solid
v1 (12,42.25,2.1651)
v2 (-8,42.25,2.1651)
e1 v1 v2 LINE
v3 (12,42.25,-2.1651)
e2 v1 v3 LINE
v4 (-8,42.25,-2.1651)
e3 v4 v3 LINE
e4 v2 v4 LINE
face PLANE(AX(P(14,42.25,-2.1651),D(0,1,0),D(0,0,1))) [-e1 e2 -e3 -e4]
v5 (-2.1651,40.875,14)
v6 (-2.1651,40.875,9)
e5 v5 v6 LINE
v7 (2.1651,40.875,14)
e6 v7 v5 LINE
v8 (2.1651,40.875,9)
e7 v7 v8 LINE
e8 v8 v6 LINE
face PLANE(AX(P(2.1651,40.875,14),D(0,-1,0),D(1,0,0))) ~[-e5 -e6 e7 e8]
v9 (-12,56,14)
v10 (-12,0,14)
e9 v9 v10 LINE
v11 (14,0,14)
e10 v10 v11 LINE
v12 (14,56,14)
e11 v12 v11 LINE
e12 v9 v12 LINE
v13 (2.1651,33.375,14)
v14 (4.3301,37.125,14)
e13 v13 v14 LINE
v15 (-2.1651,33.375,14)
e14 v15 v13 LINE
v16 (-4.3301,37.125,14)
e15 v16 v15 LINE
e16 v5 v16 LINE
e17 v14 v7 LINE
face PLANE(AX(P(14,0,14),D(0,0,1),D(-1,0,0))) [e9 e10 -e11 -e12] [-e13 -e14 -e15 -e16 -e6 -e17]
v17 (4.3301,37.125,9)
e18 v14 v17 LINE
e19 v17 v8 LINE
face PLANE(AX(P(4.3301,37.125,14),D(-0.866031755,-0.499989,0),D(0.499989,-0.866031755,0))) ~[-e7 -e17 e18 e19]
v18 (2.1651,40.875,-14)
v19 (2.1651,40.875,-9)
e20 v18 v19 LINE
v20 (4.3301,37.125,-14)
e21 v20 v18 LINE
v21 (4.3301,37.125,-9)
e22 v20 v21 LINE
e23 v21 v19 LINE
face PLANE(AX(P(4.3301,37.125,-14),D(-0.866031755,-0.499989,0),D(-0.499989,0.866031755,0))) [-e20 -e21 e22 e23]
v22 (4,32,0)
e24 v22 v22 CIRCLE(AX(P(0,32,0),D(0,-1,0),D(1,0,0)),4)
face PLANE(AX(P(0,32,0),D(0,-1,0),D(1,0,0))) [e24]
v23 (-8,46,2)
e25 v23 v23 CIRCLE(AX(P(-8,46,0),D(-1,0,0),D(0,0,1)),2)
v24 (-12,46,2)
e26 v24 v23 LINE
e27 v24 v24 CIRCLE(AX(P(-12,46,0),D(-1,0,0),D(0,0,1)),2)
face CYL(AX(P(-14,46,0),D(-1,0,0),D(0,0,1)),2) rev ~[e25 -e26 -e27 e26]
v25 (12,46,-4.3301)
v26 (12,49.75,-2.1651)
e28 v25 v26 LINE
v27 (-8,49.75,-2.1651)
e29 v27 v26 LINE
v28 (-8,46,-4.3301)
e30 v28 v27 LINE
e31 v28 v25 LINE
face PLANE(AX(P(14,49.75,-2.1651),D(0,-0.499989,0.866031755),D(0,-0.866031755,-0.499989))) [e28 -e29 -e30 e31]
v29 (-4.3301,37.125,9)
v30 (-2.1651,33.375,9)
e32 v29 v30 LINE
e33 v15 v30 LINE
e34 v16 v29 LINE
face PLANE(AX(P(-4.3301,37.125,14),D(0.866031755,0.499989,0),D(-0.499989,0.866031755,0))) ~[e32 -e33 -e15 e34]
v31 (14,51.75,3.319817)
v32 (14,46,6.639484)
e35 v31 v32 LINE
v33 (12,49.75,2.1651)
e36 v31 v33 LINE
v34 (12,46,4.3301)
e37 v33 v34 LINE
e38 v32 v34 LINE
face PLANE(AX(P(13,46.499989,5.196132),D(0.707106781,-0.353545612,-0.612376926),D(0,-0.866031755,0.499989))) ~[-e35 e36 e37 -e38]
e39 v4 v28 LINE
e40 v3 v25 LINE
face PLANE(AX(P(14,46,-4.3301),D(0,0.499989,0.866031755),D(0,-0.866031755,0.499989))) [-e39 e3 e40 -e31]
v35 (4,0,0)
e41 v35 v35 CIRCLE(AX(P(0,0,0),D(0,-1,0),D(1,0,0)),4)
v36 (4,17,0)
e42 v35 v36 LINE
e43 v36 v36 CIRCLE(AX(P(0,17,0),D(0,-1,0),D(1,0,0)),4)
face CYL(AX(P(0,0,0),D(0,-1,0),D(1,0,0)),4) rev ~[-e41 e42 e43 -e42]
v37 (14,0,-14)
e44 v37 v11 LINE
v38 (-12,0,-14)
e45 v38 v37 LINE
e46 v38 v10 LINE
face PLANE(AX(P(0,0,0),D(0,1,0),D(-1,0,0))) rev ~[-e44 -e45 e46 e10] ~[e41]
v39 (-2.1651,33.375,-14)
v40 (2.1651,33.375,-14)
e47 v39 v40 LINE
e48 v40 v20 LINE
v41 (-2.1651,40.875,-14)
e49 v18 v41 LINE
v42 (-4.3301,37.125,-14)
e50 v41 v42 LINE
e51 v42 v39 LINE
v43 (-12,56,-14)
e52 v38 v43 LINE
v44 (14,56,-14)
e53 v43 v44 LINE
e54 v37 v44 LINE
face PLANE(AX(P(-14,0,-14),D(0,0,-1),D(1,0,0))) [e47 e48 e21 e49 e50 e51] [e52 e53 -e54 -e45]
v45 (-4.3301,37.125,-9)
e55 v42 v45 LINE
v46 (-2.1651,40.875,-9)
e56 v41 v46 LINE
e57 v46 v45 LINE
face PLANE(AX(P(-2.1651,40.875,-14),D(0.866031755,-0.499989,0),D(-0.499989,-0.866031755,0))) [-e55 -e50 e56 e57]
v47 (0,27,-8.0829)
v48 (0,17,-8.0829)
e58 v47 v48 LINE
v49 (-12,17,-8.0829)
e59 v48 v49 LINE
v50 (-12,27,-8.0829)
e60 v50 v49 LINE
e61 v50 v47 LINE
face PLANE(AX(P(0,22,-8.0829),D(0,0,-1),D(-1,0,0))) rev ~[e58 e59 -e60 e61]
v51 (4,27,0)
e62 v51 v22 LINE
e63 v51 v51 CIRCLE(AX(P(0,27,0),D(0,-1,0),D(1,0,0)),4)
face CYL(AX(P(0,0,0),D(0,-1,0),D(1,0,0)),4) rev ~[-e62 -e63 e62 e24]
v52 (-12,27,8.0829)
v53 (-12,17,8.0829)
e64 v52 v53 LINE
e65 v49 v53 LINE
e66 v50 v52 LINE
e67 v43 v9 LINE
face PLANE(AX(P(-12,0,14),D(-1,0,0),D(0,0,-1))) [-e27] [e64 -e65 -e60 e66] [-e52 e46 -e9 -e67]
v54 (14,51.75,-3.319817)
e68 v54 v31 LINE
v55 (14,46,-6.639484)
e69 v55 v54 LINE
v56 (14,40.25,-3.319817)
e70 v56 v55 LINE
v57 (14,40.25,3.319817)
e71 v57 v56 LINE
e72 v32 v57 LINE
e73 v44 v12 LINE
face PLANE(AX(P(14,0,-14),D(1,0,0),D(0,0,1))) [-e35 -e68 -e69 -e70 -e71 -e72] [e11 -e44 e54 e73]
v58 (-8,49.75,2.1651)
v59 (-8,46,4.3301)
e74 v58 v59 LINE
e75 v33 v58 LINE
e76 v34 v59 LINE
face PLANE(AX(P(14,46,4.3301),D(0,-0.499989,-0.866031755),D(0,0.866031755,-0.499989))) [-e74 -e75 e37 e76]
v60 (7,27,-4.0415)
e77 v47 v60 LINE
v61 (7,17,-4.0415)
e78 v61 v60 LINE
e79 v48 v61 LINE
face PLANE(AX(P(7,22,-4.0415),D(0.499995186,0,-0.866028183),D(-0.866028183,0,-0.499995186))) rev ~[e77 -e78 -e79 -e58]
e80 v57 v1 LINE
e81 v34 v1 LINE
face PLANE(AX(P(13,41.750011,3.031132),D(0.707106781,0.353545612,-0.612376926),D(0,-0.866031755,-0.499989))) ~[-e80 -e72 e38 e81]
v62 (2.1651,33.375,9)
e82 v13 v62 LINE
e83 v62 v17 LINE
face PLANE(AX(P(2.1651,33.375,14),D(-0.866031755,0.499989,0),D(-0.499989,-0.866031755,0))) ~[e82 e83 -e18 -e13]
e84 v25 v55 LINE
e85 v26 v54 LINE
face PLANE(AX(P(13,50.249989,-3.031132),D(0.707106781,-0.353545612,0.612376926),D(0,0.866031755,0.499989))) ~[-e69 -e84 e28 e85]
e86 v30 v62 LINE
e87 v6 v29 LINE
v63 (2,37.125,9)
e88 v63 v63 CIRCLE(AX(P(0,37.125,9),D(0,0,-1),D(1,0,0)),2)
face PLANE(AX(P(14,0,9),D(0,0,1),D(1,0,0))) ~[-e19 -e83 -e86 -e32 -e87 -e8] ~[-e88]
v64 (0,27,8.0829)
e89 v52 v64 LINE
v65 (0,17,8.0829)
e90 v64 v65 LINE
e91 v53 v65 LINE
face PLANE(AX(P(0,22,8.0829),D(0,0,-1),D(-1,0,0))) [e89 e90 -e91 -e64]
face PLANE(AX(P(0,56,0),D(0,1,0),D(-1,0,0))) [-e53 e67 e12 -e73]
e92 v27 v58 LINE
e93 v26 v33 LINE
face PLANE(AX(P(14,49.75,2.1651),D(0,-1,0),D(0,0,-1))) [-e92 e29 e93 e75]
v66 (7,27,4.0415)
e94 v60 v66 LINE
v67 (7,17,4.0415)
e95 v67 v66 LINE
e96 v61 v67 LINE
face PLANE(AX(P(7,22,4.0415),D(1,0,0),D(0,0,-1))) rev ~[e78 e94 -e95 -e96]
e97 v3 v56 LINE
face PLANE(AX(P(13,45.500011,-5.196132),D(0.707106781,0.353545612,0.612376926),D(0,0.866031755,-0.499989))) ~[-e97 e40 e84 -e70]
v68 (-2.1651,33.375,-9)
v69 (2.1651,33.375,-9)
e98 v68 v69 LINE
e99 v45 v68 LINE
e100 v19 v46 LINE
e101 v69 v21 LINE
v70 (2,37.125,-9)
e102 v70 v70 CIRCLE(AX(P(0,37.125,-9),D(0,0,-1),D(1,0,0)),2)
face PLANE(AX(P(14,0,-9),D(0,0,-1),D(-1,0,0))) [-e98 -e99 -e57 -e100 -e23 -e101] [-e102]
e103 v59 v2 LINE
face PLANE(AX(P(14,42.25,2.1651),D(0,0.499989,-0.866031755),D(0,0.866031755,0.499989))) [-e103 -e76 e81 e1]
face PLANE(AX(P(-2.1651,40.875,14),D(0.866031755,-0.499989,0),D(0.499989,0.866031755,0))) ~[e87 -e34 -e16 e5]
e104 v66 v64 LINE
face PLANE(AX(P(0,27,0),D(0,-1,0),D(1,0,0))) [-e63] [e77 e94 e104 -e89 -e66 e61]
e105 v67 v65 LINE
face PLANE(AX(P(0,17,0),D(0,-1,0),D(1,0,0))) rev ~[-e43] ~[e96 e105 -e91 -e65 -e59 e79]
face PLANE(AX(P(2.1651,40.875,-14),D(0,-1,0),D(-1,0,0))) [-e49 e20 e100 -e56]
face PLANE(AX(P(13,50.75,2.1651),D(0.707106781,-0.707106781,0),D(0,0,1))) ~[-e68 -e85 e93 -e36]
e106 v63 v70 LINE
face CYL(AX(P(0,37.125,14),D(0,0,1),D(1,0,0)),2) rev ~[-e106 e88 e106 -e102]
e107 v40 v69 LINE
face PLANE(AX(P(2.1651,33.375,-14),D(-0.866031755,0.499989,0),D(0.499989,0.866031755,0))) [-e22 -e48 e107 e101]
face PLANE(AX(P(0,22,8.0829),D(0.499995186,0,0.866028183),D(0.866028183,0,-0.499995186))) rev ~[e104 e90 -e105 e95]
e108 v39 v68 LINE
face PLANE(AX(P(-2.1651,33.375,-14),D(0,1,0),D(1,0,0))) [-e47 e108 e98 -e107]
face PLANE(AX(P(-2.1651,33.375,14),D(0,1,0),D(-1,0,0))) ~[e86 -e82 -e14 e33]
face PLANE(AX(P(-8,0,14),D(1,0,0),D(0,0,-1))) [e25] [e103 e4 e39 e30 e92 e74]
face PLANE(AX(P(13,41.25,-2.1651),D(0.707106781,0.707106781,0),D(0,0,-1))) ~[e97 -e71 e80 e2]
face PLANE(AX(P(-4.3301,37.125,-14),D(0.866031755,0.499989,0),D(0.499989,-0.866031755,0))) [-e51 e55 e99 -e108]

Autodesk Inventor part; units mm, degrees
ref_plane "YZ Plane" through (0, 0, 0) normal (1, 0, 0) x (0, 1, 0)
ref_plane "XZ Plane" through (0, 0, 0) normal (0, 1, 0) x (-1, 0, 0)
ref_plane "XY Plane" through (0, 0, 0) normal (0, 0, 1) x (1, 0, 0)
sketch "Эскиз1" plane through (0, 0, 0) normal (0, 1, 0) x (-1, 0, 0)
  line L0 (-14, 14) -> (14, 14)
  line L1 (14, 14) -> (14, -14)
  line L2 (14, -14) -> (-14, -14)
  line L3 (-14, -14) -> (-14, 14)
  line L4 (-14, 14) -> (14, -14) construction
  line L5 (14, 14) -> (-14, -14) construction
  point P0 (0, 0)
  dimension "d0" = 28
  dimension "d1" = 28
extrude "Выдавливание1" add sketch "Эскиз1" along normal blind 56
sketch "Эскиз2" plane through (0, 0, 0) normal (0, -1, 0) x (1, 0, 0)
  circle A0 centre (0, 0) radius 4
extrude "Выдавливание2" cut sketch "Эскиз2" against normal blind 32
sketch "Эскиз3" plane through (-14, 0, -14) normal (-1, 0, 0) x (0, 0, 1)
  circle A0 centre (14, 46) radius 2
  point P0 (14, 0)
  dimension "d24" = 4
extrude "Выдавливание3" cut sketch "Эскиз3" against normal through all
sketch "Эскиз4" plane through (14, 0, 14) normal (1, 0, 0) x (0, 0, -1)
  circle A0 centre (14, 46) radius 2 projected
  line L0 (9.6699, 46) -> (11.8349, 49.75)
  line L1 (11.8349, 49.75) -> (16.1651, 49.75)
  line L2 (16.1651, 49.75) -> (18.3301, 46)
  line L3 (18.3301, 46) -> (16.1651, 42.25)
  line L4 (16.1651, 42.25) -> (11.8349, 42.25)
  line L5 (11.8349, 42.25) -> (9.6699, 46)
  line L6 (0, 56) -> (28, 56) projected
  point P0 (14, 0)
  dimension "d8" = 7.5
extrude "Выдавливание4" cut sketch "Эскиз4" against normal blind 22
chamfer "Фаска1" distance 2 angle 45 6 edges at (14, 42.25, 0) (14, 44.125, -3.2476) (14, 47.875, -3.2476) (14, 49.75, 0) (14, 47.875, 3.2476) (14, 44.125, 3.2476)
ref_plane "РабПлоскость1" through (0, 22, 0) normal (0, -1, 0) x (1, 0, 0)
sketch "Эскиз5" plane through (0, 22, 0) normal (0, -1, 0) x (1, 0, 0)
  line L0 (0, 8.0829) -> (7, 4.0415)
  line L1 (7, 4.0415) -> (7, -4.0415)
  line L2 (7, -4.0415) -> (0, -8.0829)
  line L3 (0, -8.0829) -> (-7, -4.0415)
  line L4 (-7, -4.0415) -> (-7, 4.0415)
  line L5 (-7, 4.0415) -> (0, 8.0829)
  line L6 (0, 8.0829) -> (-14, 8.0829)
  line L7 (-14, -14) -> (-14, 14) projected
  line L8 (0, -8.0829) -> (-14, -8.0829)
  line L9 (-14, 8.0829) -> (-14, -8.0829)
  point P0 (0, 0)
  point P1 (0, 0)
  dimension "d15" = 14
extrude "Выдавливание5" cut sketch "Эскиз5" along normal mid plane 10
move faces "Перенос1" translate (2, 0, 0) faces at (-14, 5.6667, -2.6943)
sketch "Эскиз7" plane through (14, 0, 14) normal (0, 0, 1) x (1, 0, 0)
  line L0 (-10, 32) -> (-18, 32) projected
  line L1 (-2, 42.25) -> (-22, 42.25) projected
  circle A0 centre (-14, 37.125) radius 2
  line L2 (-14, 32) -> (-14, 42.25) construction
  point P0 (-14, 0)
  dimension "d28" = 4
extrude "Выдавливание7" cut sketch "Эскиз7" against normal blind 36.5
sketch "Эскиз8" plane through (14, 0, -14) normal (0, 0, -1) x (-1, 0, 0)
  circle A0 centre (14, 37.125) radius 2 projected
  line L0 (18.3301, 37.125) -> (16.1651, 33.375)
  line L1 (16.1651, 33.375) -> (11.8349, 33.375)
  line L2 (11.8349, 33.375) -> (9.6699, 37.125)
  line L3 (9.6699, 37.125) -> (11.8349, 40.875)
  line L4 (11.8349, 40.875) -> (16.1651, 40.875)
  line L5 (16.1651, 40.875) -> (18.3301, 37.125)
  point P0 (14, 0)
  dimension "d31" = 7.5
extrude "Выдавливание8" cut sketch "Эскиз8" against normal blind 5
mirror "Зеркальное отражение1" about plane through (0, 0, 0) normal (0, 0, 1) of "Выдавливание8"
sketch "Эскиз10" plane through (14, 0, 14) normal (0, 0, 1) x (1, 0, 0)
  line L0 (0, 0) -> (0, 56) projected
  line L1 (-26, 0) -> (-26, 56) projected
  line L2 (0, 56) -> (-26, 56)
  line L3 (-26, 56) -> (-26, 32)
  line L4 (-26, 32) -> (0, 32)
  line L5 (0, 32) -> (0, 56)
  line L6 (-26, 0) -> (0, 0) projected
  point P0 (-14, 0)
  dimension "d35" = 32
equation "\"d1\" = d0"
equation "\"d2\" = 2 * d0"
properties part number "000.001.001 - Уголок" material "Пластик АБС"
